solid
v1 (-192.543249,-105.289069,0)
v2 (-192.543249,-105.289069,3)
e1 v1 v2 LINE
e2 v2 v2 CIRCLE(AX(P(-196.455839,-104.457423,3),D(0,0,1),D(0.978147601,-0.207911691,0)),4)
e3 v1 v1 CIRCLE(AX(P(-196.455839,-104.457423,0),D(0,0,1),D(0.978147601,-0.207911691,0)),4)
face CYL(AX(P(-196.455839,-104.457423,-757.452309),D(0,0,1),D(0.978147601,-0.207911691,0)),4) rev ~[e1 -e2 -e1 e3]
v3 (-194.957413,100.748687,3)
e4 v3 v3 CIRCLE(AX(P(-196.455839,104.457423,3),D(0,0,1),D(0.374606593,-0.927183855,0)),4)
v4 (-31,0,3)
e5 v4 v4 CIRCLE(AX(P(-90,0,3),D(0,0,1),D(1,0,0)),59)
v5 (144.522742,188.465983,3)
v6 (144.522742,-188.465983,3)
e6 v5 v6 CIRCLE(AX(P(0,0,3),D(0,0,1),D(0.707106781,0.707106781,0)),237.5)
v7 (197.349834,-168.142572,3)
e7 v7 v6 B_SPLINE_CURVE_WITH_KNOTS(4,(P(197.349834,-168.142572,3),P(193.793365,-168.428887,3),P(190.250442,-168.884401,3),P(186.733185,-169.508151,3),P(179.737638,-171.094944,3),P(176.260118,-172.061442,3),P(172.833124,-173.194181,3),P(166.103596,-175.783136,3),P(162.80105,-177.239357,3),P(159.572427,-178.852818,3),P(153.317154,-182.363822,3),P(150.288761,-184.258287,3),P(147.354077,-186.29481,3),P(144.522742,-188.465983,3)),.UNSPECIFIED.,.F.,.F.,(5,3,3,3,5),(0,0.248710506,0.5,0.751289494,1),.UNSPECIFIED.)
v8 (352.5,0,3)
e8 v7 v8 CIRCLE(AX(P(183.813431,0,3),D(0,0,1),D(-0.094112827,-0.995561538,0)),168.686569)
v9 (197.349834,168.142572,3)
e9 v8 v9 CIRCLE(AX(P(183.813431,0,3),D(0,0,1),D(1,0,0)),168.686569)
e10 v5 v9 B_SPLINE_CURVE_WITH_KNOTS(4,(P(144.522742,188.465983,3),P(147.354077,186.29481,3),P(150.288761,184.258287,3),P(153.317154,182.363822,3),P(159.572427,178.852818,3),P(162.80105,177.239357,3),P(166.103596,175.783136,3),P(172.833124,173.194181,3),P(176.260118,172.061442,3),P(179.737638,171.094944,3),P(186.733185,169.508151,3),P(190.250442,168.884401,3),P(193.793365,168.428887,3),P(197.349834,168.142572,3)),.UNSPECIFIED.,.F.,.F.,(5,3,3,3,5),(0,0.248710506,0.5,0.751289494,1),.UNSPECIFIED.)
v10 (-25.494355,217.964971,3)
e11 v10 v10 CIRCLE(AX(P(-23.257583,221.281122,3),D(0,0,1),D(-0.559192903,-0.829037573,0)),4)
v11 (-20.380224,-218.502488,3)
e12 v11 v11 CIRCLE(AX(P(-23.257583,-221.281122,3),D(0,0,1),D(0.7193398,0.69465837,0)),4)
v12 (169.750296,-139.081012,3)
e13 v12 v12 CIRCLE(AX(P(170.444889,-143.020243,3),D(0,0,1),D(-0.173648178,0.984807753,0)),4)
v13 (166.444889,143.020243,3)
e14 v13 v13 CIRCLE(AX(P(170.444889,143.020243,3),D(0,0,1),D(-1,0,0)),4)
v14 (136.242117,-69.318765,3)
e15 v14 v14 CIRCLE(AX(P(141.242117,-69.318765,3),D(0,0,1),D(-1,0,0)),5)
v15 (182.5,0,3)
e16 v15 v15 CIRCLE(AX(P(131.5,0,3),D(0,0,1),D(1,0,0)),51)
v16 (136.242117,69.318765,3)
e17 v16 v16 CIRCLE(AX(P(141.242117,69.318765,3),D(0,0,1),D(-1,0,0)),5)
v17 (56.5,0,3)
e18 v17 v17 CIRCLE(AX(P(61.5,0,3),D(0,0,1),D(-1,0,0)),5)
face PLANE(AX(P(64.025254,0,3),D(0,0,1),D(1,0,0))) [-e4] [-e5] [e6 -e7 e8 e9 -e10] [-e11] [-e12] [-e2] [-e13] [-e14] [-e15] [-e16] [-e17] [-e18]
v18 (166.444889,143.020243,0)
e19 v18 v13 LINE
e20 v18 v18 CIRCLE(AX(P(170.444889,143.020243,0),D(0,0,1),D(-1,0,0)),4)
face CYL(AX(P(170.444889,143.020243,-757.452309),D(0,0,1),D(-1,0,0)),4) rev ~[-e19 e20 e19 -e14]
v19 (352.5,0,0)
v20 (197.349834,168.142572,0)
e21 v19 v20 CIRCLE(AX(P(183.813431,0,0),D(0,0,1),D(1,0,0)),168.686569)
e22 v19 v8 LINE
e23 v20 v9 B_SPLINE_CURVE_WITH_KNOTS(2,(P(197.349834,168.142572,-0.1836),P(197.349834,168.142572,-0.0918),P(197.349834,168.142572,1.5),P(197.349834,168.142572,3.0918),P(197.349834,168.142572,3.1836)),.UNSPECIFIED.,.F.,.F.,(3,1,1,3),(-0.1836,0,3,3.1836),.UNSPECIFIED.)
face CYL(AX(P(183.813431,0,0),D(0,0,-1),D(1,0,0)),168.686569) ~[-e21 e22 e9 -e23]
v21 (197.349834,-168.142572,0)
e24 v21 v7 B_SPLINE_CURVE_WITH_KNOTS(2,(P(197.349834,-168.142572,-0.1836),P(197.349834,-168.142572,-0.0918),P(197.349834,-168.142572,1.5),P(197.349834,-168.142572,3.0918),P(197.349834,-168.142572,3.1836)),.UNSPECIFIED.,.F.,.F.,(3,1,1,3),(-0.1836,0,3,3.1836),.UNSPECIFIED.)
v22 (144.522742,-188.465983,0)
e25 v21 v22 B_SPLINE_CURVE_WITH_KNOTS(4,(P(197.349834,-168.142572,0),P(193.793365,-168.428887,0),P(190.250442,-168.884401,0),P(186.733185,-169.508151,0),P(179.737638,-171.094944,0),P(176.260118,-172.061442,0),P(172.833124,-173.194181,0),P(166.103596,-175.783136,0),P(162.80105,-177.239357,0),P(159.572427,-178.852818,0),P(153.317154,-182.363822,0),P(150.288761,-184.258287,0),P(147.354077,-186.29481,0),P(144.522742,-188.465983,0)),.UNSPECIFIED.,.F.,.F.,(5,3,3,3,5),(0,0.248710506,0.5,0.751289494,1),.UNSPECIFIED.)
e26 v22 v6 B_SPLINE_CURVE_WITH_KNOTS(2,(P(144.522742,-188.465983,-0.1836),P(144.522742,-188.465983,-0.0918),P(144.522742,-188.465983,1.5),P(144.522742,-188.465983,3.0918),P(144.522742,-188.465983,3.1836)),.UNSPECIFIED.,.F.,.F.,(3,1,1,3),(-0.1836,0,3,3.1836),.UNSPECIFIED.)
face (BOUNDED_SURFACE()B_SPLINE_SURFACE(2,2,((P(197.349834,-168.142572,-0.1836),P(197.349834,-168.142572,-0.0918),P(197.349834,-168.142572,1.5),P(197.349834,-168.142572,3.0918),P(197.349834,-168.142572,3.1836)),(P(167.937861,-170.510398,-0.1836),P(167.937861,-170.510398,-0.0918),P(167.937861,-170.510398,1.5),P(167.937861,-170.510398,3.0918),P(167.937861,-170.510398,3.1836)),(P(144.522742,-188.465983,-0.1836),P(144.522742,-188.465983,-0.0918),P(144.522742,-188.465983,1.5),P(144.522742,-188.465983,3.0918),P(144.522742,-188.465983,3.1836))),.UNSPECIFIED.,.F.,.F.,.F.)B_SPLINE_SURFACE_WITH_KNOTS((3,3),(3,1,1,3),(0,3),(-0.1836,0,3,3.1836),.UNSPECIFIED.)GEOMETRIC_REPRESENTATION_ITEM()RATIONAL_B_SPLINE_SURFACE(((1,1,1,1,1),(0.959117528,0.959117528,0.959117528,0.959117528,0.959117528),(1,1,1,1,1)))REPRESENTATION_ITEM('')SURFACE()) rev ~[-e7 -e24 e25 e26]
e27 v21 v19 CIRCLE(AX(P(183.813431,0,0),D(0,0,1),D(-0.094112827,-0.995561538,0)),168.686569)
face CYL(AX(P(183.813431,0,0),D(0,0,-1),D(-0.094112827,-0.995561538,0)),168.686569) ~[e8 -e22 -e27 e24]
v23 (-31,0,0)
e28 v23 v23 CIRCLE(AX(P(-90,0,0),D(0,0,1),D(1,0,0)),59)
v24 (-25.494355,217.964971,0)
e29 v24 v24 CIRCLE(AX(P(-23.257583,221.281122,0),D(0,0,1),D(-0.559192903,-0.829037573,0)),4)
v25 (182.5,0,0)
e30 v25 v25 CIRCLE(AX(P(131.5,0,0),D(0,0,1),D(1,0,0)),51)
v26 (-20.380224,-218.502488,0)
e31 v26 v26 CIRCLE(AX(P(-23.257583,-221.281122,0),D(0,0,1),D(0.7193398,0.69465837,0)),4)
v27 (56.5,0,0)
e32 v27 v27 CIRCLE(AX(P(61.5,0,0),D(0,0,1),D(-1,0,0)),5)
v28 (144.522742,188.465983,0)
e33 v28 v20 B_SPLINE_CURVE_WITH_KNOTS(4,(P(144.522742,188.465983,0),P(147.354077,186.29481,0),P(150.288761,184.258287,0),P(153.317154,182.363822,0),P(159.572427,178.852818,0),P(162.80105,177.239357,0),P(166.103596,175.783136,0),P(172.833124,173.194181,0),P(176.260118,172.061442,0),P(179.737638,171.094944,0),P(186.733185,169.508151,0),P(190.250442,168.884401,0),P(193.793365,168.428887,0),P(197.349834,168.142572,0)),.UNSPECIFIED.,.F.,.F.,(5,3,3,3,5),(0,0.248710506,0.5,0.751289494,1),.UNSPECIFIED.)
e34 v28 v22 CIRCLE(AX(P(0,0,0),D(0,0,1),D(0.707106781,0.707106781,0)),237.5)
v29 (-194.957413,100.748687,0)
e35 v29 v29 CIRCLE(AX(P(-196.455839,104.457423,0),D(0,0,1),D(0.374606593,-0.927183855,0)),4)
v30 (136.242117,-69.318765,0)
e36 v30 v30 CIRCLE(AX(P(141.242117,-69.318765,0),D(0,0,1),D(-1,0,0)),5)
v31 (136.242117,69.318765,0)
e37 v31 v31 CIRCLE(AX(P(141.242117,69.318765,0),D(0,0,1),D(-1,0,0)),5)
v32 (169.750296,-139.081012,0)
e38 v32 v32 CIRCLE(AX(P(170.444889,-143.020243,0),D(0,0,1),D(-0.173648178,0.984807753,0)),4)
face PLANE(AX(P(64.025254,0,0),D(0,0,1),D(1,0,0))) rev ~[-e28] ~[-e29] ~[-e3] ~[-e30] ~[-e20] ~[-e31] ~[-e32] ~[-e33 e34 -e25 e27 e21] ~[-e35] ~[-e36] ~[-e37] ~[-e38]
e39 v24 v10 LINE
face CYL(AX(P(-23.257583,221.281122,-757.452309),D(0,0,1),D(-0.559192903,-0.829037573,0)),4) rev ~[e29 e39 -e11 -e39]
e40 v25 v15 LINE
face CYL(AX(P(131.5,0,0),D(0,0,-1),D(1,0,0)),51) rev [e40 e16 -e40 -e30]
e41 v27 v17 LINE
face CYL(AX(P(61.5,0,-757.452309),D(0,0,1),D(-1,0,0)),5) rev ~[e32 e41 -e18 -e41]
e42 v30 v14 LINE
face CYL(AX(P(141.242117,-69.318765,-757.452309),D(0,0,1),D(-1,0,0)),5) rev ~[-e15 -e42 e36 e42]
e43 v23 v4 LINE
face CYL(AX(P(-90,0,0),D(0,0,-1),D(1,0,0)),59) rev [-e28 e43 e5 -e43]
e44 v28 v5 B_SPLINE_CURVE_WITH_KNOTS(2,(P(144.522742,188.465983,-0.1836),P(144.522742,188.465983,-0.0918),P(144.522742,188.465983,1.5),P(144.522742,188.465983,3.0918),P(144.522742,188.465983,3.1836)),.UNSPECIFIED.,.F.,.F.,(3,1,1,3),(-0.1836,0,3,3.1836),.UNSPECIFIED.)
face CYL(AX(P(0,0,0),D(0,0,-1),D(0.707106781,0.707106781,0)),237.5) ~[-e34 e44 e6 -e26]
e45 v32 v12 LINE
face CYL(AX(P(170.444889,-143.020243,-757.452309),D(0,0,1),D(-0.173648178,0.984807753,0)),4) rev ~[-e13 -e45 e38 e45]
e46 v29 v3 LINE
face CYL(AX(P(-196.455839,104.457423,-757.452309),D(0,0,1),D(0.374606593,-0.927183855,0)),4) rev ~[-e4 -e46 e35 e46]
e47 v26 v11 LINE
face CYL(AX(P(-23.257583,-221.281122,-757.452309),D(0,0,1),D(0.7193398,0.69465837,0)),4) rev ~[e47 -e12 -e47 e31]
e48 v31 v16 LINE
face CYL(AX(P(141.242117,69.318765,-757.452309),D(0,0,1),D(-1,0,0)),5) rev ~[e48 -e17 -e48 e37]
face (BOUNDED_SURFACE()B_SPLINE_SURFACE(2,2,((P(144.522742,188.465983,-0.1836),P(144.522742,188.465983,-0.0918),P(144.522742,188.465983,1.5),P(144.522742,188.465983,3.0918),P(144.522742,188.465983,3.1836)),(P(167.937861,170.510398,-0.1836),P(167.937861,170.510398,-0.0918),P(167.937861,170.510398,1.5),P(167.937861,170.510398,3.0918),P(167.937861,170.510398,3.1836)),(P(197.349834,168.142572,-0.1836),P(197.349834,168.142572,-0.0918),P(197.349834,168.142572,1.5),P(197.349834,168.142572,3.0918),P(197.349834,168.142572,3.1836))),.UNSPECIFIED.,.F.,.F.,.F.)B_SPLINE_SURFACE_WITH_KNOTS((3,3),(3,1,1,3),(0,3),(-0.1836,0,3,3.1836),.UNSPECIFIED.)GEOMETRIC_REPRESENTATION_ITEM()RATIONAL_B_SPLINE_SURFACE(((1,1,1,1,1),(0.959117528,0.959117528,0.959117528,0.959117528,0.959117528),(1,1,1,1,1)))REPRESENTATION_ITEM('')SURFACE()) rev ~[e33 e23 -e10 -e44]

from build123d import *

# Parameters (mm, degrees)
F0_R            = 59
F0_R_2          = 51
F1_DEPTH        = 3
F2_R            = 100
F3_D            = 8
F3_COPIES_COUNT = 6
F3_COPIES_ANGLE = 280
F4_D            = 10


# Not quite as in the source:
# - a pattern or mirror of a feature is missing from the dataset's text; its kind, count and spacing are read off the source's solid


with BuildPart() as f1:
    # F0 (on Top) → F1 (new body)
    with BuildSketch(Plane.XY):
        with BuildLine():
            ThreePointArc((167.9378605318, -167.9378605318), (297.3413197874, -124.7660894685), (352.5, 0))
            ThreePointArc((352.5, 0), (297.3413197874, 124.7660894685), (167.9378605318, 167.9378605318))
            ThreePointArc((167.9378605318, 167.9378605318), (-237.5, 0), (167.9378605318, -167.9378605318))
        make_face()
        with Locations((-90, 0)):
            Circle(F0_R, mode=Mode.SUBTRACT)
        with Locations((131.5, 0)):
            Circle(F0_R_2, mode=Mode.SUBTRACT)
    extrude(amount=F1_DEPTH)

    # F2
    f2_edges = [f1.edges().sort_by_distance(p)[0] for p in [
        (167.937861, -167.937861, 1.5),
        (167.937861, 167.937861, 1.5),
    ]]
    fillet(f2_edges, radius=F2_R)

    # F3 (through all)
    with Locations(Plane(origin=(0, 0, 0), x_dir=(1, 0, 0), z_dir=(0, 0, -1))):
        with Locations((170.444888594, -143.0202431553)):
            f3 = Hole(F3_D / 2)

    # F3_copies: F3 ×6 about axis
    f3_copies_axis = Axis((0, 0, 0), (0, 0, 1))
    for i in range(1, F3_COPIES_COUNT):
        add(f3.rotate(f3_copies_axis, i * F3_COPIES_ANGLE / (F3_COPIES_COUNT - 1)), mode=Mode.SUBTRACT)

    # F4 (through all)
    with Locations(Plane(origin=(0, 0, 0), x_dir=(1, 0, 0), z_dir=(0, 0, -1))):
        with Locations((141.2421170672, -69.3187648119), (61.5, 0), (141.2421170672, 69.3187648119)):
            Hole(F4_D / 2)


solid = f1.part
